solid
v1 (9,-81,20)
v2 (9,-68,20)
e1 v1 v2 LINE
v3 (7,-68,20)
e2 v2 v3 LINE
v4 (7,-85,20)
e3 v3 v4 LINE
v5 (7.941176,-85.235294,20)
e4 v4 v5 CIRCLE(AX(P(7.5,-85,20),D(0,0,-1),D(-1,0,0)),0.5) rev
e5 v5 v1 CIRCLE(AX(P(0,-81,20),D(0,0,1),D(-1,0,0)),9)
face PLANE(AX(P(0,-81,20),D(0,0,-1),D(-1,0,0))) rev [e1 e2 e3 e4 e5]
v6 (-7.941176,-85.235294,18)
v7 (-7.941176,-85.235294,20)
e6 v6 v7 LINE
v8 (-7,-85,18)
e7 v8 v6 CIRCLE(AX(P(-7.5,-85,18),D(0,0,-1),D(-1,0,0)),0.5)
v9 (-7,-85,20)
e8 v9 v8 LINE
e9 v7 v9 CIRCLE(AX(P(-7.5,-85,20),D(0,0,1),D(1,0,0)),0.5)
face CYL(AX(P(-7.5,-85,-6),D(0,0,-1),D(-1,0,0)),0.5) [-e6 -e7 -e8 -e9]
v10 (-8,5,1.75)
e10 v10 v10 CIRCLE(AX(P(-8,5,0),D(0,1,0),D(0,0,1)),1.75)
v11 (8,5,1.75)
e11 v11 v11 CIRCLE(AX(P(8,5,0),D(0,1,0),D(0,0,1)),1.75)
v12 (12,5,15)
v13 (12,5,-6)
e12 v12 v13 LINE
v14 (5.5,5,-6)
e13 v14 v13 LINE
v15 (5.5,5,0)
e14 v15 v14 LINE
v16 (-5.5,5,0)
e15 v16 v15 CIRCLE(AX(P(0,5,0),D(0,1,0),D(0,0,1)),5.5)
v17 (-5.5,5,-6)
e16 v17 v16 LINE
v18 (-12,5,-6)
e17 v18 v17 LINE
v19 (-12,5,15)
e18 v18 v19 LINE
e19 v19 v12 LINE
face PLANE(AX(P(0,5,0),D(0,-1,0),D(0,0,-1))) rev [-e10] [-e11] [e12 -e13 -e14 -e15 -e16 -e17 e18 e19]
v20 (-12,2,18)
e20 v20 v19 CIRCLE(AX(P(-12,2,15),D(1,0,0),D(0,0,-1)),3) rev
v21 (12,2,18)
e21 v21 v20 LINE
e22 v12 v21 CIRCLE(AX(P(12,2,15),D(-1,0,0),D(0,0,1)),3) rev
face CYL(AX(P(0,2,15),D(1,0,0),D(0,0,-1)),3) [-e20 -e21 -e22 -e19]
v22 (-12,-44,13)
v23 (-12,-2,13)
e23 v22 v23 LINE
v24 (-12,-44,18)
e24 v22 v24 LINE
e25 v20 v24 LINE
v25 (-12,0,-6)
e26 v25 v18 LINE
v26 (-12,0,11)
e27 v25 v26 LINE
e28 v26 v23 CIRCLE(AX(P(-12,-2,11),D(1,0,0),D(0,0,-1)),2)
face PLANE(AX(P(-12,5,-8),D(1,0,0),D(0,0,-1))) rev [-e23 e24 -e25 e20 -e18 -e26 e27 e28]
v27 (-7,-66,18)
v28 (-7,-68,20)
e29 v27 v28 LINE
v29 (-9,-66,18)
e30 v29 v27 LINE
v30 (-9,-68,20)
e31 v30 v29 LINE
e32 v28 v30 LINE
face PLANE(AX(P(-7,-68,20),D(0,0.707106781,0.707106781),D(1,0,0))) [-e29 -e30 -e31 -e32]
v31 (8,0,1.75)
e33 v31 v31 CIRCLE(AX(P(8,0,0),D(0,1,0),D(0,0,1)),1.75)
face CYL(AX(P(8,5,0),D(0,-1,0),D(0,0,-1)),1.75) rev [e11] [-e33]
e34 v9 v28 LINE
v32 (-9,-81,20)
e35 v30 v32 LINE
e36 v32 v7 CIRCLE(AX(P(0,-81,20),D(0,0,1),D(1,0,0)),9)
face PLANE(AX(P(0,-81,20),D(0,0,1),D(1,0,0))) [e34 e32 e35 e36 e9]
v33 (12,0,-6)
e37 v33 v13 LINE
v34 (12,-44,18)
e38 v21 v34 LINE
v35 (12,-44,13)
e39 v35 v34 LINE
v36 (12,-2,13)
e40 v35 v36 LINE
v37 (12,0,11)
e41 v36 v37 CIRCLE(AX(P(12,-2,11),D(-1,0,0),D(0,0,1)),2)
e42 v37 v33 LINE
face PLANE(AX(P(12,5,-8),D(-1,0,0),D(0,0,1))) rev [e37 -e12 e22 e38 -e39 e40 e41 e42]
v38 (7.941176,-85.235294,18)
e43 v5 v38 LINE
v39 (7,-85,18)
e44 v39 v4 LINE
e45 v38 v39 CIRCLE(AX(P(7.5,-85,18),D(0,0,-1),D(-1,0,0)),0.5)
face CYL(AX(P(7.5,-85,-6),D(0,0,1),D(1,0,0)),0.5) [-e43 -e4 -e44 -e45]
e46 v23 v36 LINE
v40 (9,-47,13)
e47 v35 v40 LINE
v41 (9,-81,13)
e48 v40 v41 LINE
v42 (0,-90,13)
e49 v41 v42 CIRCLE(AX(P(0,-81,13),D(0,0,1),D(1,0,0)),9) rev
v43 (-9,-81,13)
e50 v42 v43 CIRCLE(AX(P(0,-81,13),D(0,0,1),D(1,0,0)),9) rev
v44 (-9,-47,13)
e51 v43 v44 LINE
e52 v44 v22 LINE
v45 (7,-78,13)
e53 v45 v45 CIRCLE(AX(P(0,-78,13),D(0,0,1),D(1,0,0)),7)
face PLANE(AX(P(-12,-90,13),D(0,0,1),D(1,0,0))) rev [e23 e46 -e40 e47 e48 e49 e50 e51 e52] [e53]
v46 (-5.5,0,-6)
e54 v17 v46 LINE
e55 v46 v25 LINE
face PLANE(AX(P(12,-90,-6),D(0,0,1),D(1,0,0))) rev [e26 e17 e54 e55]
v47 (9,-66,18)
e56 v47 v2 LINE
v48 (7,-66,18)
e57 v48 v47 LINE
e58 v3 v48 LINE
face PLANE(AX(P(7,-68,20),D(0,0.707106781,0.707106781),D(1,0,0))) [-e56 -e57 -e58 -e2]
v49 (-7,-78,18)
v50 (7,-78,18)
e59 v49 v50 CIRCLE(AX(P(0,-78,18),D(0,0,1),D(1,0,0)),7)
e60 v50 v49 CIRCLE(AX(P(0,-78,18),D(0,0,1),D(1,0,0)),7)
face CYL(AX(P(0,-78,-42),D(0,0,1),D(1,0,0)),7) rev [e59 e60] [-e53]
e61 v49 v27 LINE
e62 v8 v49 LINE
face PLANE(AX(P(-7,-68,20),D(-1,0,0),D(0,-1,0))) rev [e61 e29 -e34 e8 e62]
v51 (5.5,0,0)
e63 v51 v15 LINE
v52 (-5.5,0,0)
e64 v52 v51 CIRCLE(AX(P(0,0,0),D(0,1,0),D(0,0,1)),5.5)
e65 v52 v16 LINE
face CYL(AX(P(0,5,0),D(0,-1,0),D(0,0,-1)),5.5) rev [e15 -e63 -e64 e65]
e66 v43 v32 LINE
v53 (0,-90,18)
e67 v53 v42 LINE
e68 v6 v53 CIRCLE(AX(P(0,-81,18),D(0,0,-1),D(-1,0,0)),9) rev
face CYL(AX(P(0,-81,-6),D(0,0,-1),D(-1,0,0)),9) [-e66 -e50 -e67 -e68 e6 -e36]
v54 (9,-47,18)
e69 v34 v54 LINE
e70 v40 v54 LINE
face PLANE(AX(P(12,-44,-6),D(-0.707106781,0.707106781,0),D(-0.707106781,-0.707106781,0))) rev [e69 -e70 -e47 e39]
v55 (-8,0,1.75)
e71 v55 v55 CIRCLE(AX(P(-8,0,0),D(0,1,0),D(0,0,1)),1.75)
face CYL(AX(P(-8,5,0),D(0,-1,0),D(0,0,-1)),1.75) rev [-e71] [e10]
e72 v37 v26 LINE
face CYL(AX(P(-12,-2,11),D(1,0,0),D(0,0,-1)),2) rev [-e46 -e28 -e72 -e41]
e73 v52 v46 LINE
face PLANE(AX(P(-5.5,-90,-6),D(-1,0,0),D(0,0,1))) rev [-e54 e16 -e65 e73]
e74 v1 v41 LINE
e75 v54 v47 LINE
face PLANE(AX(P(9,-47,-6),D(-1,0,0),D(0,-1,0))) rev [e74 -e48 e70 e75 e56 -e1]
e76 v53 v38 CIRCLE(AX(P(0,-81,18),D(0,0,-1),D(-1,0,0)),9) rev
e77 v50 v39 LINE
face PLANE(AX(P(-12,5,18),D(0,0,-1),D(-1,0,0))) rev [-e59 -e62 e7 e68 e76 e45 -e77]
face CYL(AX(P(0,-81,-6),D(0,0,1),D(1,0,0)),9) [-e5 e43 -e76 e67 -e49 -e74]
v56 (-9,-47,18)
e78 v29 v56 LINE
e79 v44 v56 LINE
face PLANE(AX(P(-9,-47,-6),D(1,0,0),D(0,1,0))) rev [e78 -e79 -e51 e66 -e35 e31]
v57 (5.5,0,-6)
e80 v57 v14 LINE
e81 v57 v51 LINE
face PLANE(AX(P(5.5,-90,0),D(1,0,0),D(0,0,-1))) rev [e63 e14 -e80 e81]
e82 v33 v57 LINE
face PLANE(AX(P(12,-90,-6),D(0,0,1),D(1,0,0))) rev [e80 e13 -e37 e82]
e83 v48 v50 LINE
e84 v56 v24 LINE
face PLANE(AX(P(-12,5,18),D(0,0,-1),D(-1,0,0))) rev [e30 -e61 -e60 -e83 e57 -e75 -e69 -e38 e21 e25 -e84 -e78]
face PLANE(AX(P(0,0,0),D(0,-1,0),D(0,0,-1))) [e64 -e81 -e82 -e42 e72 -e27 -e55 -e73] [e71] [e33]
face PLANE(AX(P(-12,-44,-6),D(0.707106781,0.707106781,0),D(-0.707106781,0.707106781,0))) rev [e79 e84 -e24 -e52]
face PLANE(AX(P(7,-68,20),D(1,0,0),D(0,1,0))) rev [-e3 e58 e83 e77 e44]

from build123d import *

# Parameters (mm, degrees)
SKETCH1_R           = 5.5
SKETCH1_R_2         = 1.75
BOSS_EXTRUDE2_DEPTH = 5
SKETCH2_W           = 24
SKETCH2_H           = 5
BOSS_EXTRUDE3_DEPTH = 90
FILLET1_R           = 3
FILLET2_R           = 2
SKETCH3_R           = 7
CUT_EXTRUDE1_DEPTH  = 60
SKETCH4_W           = 24
SKETCH4_H           = 2
CUT_EXTRUDE2_DEPTH  = 98.432027588
SKETCH5_W           = 11
SKETCH5_H           = 6
CUT_EXTRUDE3_DEPTH  = 98.432027588
CUT_EXTRUDE4_DEPTH  = 94.914855055
FILLET4_R           = 9
BOSS_EXTRUDE4_DEPTH = 2
CHAMFER1_SIZE       = 2
FILLET5_R           = 0.5


with BuildPart() as part:
    # Sketch1 → Boss-Extrude2 (new body)
    with BuildSketch(Plane(origin=(0, 0, 0), x_dir=(1, 0, 0), z_dir=(0, 1, 0))):
        Polygon((-12, 8), (-12, -18), (12, -18), (12, 5.5), (12, 8), (0, 8), align=None)
        with Locations(Location((0, 0, 0), (0, 0, 270))):
            Circle(SKETCH1_R, mode=Mode.SUBTRACT)
        with Locations(Location((-8, 0, 0), (0, 0, 270))):
            Circle(SKETCH1_R_2, mode=Mode.SUBTRACT)
        with Locations(Location((8, 0, 0), (0, 0, 270))):
            Circle(SKETCH1_R_2, mode=Mode.SUBTRACT)
    extrude(amount=BOSS_EXTRUDE2_DEPTH)

    # Sketch2 → Boss-Extrude3 (add)
    with BuildSketch(Plane.XZ):
        with Locations((0, 15.5)):
            Rectangle(SKETCH2_W, SKETCH2_H)
    extrude(amount=BOSS_EXTRUDE3_DEPTH)

    # Fillet1
    fillet1_edges = [part.edges().sort_by_distance(p)[0] for p in [
        (0, 5, 18),
    ]]
    fillet(fillet1_edges, radius=FILLET1_R)

    # Fillet2
    fillet2_edges = [part.edges().sort_by_distance(p)[0] for p in [
        (0, 0, 13),
    ]]
    fillet(fillet2_edges, radius=FILLET2_R)

    # Sketch3 → Cut-Extrude1 (cut)
    with BuildSketch(Plane.XY.offset(18)):
        with Locations((0, -78)):
            Circle(SKETCH3_R)
    extrude(amount=-CUT_EXTRUDE1_DEPTH, mode=Mode.SUBTRACT)

    # Sketch4 → Cut-Extrude2 (cut, through all)
    with BuildSketch(Plane(origin=(0, 5, 0), x_dir=(1, 0, 0), z_dir=(0, 1, 0))):
        with Locations((0, 7)):
            Rectangle(SKETCH4_W, SKETCH4_H)
    extrude(amount=-CUT_EXTRUDE2_DEPTH, mode=Mode.SUBTRACT)

    # Sketch5 → Cut-Extrude3 (cut, through all)
    with BuildSketch(Plane(origin=(0, 5, 0), x_dir=(1, 0, 0), z_dir=(0, 1, 0))):
        with Locations((0, 3)):
            Rectangle(SKETCH5_W, SKETCH5_H)
    extrude(amount=-CUT_EXTRUDE3_DEPTH, mode=Mode.SUBTRACT)

    # Sketch6 → Cut-Extrude4 (cut, through all)
    with BuildSketch(Plane.XY.offset(18)):
        Polygon((-12, -44), (-9, -47), (-9, -90), (-12, -90), align=None)
        Polygon((9, -90), (12, -90), (12, -44), (9, -47), align=None)
    extrude(amount=-CUT_EXTRUDE4_DEPTH, mode=Mode.SUBTRACT)

    # Fillet4
    fillet4_edges = [part.edges().sort_by_distance(p)[0] for p in [
        (9, -90, 15.5),
        (-9, -90, 15.5),
    ]]
    fillet(fillet4_edges, radius=FILLET4_R - 0.0001)  # a hair under: the kernel refuses the full size

    # Sketch7 → Boss-Extrude4 (add)
    with BuildSketch(Plane.XY.offset(18)):
        with BuildLine():
            Line((-7, -68), (-7, -86.656854249))
            ThreePointArc((-7, -86.656854249), (-8.485281374, -84), (-9, -81))
            Line((-9, -81), (-9, -68))
            Line((-9, -68), (-7, -68))
        make_face()
        with BuildLine():
            Line((7, -68), (9, -68))
            Line((9, -68), (9, -81))
            ThreePointArc((9, -81), (8.485281374, -84), (7, -86.656854249))
            Line((7, -86.656854249), (7, -68))
        make_face()
    extrude(amount=BOSS_EXTRUDE4_DEPTH)

    # Chamfer1
    chamfer1_edges = [part.edges().sort_by_distance(p)[0] for p in [
        (8, -68, 18),
        (-8, -68, 18),
    ]]
    chamfer(chamfer1_edges, length=CHAMFER1_SIZE - 0.0001)  # a hair under: the kernel refuses the full size

    # Fillet5
    fillet5_edges = [part.edges().sort_by_distance(p)[0] for p in [
        (-7, -86.656854249, 19),
        (7, -86.656854249, 19),
    ]]
    fillet(fillet5_edges, radius=FILLET5_R)


solid = part.part
